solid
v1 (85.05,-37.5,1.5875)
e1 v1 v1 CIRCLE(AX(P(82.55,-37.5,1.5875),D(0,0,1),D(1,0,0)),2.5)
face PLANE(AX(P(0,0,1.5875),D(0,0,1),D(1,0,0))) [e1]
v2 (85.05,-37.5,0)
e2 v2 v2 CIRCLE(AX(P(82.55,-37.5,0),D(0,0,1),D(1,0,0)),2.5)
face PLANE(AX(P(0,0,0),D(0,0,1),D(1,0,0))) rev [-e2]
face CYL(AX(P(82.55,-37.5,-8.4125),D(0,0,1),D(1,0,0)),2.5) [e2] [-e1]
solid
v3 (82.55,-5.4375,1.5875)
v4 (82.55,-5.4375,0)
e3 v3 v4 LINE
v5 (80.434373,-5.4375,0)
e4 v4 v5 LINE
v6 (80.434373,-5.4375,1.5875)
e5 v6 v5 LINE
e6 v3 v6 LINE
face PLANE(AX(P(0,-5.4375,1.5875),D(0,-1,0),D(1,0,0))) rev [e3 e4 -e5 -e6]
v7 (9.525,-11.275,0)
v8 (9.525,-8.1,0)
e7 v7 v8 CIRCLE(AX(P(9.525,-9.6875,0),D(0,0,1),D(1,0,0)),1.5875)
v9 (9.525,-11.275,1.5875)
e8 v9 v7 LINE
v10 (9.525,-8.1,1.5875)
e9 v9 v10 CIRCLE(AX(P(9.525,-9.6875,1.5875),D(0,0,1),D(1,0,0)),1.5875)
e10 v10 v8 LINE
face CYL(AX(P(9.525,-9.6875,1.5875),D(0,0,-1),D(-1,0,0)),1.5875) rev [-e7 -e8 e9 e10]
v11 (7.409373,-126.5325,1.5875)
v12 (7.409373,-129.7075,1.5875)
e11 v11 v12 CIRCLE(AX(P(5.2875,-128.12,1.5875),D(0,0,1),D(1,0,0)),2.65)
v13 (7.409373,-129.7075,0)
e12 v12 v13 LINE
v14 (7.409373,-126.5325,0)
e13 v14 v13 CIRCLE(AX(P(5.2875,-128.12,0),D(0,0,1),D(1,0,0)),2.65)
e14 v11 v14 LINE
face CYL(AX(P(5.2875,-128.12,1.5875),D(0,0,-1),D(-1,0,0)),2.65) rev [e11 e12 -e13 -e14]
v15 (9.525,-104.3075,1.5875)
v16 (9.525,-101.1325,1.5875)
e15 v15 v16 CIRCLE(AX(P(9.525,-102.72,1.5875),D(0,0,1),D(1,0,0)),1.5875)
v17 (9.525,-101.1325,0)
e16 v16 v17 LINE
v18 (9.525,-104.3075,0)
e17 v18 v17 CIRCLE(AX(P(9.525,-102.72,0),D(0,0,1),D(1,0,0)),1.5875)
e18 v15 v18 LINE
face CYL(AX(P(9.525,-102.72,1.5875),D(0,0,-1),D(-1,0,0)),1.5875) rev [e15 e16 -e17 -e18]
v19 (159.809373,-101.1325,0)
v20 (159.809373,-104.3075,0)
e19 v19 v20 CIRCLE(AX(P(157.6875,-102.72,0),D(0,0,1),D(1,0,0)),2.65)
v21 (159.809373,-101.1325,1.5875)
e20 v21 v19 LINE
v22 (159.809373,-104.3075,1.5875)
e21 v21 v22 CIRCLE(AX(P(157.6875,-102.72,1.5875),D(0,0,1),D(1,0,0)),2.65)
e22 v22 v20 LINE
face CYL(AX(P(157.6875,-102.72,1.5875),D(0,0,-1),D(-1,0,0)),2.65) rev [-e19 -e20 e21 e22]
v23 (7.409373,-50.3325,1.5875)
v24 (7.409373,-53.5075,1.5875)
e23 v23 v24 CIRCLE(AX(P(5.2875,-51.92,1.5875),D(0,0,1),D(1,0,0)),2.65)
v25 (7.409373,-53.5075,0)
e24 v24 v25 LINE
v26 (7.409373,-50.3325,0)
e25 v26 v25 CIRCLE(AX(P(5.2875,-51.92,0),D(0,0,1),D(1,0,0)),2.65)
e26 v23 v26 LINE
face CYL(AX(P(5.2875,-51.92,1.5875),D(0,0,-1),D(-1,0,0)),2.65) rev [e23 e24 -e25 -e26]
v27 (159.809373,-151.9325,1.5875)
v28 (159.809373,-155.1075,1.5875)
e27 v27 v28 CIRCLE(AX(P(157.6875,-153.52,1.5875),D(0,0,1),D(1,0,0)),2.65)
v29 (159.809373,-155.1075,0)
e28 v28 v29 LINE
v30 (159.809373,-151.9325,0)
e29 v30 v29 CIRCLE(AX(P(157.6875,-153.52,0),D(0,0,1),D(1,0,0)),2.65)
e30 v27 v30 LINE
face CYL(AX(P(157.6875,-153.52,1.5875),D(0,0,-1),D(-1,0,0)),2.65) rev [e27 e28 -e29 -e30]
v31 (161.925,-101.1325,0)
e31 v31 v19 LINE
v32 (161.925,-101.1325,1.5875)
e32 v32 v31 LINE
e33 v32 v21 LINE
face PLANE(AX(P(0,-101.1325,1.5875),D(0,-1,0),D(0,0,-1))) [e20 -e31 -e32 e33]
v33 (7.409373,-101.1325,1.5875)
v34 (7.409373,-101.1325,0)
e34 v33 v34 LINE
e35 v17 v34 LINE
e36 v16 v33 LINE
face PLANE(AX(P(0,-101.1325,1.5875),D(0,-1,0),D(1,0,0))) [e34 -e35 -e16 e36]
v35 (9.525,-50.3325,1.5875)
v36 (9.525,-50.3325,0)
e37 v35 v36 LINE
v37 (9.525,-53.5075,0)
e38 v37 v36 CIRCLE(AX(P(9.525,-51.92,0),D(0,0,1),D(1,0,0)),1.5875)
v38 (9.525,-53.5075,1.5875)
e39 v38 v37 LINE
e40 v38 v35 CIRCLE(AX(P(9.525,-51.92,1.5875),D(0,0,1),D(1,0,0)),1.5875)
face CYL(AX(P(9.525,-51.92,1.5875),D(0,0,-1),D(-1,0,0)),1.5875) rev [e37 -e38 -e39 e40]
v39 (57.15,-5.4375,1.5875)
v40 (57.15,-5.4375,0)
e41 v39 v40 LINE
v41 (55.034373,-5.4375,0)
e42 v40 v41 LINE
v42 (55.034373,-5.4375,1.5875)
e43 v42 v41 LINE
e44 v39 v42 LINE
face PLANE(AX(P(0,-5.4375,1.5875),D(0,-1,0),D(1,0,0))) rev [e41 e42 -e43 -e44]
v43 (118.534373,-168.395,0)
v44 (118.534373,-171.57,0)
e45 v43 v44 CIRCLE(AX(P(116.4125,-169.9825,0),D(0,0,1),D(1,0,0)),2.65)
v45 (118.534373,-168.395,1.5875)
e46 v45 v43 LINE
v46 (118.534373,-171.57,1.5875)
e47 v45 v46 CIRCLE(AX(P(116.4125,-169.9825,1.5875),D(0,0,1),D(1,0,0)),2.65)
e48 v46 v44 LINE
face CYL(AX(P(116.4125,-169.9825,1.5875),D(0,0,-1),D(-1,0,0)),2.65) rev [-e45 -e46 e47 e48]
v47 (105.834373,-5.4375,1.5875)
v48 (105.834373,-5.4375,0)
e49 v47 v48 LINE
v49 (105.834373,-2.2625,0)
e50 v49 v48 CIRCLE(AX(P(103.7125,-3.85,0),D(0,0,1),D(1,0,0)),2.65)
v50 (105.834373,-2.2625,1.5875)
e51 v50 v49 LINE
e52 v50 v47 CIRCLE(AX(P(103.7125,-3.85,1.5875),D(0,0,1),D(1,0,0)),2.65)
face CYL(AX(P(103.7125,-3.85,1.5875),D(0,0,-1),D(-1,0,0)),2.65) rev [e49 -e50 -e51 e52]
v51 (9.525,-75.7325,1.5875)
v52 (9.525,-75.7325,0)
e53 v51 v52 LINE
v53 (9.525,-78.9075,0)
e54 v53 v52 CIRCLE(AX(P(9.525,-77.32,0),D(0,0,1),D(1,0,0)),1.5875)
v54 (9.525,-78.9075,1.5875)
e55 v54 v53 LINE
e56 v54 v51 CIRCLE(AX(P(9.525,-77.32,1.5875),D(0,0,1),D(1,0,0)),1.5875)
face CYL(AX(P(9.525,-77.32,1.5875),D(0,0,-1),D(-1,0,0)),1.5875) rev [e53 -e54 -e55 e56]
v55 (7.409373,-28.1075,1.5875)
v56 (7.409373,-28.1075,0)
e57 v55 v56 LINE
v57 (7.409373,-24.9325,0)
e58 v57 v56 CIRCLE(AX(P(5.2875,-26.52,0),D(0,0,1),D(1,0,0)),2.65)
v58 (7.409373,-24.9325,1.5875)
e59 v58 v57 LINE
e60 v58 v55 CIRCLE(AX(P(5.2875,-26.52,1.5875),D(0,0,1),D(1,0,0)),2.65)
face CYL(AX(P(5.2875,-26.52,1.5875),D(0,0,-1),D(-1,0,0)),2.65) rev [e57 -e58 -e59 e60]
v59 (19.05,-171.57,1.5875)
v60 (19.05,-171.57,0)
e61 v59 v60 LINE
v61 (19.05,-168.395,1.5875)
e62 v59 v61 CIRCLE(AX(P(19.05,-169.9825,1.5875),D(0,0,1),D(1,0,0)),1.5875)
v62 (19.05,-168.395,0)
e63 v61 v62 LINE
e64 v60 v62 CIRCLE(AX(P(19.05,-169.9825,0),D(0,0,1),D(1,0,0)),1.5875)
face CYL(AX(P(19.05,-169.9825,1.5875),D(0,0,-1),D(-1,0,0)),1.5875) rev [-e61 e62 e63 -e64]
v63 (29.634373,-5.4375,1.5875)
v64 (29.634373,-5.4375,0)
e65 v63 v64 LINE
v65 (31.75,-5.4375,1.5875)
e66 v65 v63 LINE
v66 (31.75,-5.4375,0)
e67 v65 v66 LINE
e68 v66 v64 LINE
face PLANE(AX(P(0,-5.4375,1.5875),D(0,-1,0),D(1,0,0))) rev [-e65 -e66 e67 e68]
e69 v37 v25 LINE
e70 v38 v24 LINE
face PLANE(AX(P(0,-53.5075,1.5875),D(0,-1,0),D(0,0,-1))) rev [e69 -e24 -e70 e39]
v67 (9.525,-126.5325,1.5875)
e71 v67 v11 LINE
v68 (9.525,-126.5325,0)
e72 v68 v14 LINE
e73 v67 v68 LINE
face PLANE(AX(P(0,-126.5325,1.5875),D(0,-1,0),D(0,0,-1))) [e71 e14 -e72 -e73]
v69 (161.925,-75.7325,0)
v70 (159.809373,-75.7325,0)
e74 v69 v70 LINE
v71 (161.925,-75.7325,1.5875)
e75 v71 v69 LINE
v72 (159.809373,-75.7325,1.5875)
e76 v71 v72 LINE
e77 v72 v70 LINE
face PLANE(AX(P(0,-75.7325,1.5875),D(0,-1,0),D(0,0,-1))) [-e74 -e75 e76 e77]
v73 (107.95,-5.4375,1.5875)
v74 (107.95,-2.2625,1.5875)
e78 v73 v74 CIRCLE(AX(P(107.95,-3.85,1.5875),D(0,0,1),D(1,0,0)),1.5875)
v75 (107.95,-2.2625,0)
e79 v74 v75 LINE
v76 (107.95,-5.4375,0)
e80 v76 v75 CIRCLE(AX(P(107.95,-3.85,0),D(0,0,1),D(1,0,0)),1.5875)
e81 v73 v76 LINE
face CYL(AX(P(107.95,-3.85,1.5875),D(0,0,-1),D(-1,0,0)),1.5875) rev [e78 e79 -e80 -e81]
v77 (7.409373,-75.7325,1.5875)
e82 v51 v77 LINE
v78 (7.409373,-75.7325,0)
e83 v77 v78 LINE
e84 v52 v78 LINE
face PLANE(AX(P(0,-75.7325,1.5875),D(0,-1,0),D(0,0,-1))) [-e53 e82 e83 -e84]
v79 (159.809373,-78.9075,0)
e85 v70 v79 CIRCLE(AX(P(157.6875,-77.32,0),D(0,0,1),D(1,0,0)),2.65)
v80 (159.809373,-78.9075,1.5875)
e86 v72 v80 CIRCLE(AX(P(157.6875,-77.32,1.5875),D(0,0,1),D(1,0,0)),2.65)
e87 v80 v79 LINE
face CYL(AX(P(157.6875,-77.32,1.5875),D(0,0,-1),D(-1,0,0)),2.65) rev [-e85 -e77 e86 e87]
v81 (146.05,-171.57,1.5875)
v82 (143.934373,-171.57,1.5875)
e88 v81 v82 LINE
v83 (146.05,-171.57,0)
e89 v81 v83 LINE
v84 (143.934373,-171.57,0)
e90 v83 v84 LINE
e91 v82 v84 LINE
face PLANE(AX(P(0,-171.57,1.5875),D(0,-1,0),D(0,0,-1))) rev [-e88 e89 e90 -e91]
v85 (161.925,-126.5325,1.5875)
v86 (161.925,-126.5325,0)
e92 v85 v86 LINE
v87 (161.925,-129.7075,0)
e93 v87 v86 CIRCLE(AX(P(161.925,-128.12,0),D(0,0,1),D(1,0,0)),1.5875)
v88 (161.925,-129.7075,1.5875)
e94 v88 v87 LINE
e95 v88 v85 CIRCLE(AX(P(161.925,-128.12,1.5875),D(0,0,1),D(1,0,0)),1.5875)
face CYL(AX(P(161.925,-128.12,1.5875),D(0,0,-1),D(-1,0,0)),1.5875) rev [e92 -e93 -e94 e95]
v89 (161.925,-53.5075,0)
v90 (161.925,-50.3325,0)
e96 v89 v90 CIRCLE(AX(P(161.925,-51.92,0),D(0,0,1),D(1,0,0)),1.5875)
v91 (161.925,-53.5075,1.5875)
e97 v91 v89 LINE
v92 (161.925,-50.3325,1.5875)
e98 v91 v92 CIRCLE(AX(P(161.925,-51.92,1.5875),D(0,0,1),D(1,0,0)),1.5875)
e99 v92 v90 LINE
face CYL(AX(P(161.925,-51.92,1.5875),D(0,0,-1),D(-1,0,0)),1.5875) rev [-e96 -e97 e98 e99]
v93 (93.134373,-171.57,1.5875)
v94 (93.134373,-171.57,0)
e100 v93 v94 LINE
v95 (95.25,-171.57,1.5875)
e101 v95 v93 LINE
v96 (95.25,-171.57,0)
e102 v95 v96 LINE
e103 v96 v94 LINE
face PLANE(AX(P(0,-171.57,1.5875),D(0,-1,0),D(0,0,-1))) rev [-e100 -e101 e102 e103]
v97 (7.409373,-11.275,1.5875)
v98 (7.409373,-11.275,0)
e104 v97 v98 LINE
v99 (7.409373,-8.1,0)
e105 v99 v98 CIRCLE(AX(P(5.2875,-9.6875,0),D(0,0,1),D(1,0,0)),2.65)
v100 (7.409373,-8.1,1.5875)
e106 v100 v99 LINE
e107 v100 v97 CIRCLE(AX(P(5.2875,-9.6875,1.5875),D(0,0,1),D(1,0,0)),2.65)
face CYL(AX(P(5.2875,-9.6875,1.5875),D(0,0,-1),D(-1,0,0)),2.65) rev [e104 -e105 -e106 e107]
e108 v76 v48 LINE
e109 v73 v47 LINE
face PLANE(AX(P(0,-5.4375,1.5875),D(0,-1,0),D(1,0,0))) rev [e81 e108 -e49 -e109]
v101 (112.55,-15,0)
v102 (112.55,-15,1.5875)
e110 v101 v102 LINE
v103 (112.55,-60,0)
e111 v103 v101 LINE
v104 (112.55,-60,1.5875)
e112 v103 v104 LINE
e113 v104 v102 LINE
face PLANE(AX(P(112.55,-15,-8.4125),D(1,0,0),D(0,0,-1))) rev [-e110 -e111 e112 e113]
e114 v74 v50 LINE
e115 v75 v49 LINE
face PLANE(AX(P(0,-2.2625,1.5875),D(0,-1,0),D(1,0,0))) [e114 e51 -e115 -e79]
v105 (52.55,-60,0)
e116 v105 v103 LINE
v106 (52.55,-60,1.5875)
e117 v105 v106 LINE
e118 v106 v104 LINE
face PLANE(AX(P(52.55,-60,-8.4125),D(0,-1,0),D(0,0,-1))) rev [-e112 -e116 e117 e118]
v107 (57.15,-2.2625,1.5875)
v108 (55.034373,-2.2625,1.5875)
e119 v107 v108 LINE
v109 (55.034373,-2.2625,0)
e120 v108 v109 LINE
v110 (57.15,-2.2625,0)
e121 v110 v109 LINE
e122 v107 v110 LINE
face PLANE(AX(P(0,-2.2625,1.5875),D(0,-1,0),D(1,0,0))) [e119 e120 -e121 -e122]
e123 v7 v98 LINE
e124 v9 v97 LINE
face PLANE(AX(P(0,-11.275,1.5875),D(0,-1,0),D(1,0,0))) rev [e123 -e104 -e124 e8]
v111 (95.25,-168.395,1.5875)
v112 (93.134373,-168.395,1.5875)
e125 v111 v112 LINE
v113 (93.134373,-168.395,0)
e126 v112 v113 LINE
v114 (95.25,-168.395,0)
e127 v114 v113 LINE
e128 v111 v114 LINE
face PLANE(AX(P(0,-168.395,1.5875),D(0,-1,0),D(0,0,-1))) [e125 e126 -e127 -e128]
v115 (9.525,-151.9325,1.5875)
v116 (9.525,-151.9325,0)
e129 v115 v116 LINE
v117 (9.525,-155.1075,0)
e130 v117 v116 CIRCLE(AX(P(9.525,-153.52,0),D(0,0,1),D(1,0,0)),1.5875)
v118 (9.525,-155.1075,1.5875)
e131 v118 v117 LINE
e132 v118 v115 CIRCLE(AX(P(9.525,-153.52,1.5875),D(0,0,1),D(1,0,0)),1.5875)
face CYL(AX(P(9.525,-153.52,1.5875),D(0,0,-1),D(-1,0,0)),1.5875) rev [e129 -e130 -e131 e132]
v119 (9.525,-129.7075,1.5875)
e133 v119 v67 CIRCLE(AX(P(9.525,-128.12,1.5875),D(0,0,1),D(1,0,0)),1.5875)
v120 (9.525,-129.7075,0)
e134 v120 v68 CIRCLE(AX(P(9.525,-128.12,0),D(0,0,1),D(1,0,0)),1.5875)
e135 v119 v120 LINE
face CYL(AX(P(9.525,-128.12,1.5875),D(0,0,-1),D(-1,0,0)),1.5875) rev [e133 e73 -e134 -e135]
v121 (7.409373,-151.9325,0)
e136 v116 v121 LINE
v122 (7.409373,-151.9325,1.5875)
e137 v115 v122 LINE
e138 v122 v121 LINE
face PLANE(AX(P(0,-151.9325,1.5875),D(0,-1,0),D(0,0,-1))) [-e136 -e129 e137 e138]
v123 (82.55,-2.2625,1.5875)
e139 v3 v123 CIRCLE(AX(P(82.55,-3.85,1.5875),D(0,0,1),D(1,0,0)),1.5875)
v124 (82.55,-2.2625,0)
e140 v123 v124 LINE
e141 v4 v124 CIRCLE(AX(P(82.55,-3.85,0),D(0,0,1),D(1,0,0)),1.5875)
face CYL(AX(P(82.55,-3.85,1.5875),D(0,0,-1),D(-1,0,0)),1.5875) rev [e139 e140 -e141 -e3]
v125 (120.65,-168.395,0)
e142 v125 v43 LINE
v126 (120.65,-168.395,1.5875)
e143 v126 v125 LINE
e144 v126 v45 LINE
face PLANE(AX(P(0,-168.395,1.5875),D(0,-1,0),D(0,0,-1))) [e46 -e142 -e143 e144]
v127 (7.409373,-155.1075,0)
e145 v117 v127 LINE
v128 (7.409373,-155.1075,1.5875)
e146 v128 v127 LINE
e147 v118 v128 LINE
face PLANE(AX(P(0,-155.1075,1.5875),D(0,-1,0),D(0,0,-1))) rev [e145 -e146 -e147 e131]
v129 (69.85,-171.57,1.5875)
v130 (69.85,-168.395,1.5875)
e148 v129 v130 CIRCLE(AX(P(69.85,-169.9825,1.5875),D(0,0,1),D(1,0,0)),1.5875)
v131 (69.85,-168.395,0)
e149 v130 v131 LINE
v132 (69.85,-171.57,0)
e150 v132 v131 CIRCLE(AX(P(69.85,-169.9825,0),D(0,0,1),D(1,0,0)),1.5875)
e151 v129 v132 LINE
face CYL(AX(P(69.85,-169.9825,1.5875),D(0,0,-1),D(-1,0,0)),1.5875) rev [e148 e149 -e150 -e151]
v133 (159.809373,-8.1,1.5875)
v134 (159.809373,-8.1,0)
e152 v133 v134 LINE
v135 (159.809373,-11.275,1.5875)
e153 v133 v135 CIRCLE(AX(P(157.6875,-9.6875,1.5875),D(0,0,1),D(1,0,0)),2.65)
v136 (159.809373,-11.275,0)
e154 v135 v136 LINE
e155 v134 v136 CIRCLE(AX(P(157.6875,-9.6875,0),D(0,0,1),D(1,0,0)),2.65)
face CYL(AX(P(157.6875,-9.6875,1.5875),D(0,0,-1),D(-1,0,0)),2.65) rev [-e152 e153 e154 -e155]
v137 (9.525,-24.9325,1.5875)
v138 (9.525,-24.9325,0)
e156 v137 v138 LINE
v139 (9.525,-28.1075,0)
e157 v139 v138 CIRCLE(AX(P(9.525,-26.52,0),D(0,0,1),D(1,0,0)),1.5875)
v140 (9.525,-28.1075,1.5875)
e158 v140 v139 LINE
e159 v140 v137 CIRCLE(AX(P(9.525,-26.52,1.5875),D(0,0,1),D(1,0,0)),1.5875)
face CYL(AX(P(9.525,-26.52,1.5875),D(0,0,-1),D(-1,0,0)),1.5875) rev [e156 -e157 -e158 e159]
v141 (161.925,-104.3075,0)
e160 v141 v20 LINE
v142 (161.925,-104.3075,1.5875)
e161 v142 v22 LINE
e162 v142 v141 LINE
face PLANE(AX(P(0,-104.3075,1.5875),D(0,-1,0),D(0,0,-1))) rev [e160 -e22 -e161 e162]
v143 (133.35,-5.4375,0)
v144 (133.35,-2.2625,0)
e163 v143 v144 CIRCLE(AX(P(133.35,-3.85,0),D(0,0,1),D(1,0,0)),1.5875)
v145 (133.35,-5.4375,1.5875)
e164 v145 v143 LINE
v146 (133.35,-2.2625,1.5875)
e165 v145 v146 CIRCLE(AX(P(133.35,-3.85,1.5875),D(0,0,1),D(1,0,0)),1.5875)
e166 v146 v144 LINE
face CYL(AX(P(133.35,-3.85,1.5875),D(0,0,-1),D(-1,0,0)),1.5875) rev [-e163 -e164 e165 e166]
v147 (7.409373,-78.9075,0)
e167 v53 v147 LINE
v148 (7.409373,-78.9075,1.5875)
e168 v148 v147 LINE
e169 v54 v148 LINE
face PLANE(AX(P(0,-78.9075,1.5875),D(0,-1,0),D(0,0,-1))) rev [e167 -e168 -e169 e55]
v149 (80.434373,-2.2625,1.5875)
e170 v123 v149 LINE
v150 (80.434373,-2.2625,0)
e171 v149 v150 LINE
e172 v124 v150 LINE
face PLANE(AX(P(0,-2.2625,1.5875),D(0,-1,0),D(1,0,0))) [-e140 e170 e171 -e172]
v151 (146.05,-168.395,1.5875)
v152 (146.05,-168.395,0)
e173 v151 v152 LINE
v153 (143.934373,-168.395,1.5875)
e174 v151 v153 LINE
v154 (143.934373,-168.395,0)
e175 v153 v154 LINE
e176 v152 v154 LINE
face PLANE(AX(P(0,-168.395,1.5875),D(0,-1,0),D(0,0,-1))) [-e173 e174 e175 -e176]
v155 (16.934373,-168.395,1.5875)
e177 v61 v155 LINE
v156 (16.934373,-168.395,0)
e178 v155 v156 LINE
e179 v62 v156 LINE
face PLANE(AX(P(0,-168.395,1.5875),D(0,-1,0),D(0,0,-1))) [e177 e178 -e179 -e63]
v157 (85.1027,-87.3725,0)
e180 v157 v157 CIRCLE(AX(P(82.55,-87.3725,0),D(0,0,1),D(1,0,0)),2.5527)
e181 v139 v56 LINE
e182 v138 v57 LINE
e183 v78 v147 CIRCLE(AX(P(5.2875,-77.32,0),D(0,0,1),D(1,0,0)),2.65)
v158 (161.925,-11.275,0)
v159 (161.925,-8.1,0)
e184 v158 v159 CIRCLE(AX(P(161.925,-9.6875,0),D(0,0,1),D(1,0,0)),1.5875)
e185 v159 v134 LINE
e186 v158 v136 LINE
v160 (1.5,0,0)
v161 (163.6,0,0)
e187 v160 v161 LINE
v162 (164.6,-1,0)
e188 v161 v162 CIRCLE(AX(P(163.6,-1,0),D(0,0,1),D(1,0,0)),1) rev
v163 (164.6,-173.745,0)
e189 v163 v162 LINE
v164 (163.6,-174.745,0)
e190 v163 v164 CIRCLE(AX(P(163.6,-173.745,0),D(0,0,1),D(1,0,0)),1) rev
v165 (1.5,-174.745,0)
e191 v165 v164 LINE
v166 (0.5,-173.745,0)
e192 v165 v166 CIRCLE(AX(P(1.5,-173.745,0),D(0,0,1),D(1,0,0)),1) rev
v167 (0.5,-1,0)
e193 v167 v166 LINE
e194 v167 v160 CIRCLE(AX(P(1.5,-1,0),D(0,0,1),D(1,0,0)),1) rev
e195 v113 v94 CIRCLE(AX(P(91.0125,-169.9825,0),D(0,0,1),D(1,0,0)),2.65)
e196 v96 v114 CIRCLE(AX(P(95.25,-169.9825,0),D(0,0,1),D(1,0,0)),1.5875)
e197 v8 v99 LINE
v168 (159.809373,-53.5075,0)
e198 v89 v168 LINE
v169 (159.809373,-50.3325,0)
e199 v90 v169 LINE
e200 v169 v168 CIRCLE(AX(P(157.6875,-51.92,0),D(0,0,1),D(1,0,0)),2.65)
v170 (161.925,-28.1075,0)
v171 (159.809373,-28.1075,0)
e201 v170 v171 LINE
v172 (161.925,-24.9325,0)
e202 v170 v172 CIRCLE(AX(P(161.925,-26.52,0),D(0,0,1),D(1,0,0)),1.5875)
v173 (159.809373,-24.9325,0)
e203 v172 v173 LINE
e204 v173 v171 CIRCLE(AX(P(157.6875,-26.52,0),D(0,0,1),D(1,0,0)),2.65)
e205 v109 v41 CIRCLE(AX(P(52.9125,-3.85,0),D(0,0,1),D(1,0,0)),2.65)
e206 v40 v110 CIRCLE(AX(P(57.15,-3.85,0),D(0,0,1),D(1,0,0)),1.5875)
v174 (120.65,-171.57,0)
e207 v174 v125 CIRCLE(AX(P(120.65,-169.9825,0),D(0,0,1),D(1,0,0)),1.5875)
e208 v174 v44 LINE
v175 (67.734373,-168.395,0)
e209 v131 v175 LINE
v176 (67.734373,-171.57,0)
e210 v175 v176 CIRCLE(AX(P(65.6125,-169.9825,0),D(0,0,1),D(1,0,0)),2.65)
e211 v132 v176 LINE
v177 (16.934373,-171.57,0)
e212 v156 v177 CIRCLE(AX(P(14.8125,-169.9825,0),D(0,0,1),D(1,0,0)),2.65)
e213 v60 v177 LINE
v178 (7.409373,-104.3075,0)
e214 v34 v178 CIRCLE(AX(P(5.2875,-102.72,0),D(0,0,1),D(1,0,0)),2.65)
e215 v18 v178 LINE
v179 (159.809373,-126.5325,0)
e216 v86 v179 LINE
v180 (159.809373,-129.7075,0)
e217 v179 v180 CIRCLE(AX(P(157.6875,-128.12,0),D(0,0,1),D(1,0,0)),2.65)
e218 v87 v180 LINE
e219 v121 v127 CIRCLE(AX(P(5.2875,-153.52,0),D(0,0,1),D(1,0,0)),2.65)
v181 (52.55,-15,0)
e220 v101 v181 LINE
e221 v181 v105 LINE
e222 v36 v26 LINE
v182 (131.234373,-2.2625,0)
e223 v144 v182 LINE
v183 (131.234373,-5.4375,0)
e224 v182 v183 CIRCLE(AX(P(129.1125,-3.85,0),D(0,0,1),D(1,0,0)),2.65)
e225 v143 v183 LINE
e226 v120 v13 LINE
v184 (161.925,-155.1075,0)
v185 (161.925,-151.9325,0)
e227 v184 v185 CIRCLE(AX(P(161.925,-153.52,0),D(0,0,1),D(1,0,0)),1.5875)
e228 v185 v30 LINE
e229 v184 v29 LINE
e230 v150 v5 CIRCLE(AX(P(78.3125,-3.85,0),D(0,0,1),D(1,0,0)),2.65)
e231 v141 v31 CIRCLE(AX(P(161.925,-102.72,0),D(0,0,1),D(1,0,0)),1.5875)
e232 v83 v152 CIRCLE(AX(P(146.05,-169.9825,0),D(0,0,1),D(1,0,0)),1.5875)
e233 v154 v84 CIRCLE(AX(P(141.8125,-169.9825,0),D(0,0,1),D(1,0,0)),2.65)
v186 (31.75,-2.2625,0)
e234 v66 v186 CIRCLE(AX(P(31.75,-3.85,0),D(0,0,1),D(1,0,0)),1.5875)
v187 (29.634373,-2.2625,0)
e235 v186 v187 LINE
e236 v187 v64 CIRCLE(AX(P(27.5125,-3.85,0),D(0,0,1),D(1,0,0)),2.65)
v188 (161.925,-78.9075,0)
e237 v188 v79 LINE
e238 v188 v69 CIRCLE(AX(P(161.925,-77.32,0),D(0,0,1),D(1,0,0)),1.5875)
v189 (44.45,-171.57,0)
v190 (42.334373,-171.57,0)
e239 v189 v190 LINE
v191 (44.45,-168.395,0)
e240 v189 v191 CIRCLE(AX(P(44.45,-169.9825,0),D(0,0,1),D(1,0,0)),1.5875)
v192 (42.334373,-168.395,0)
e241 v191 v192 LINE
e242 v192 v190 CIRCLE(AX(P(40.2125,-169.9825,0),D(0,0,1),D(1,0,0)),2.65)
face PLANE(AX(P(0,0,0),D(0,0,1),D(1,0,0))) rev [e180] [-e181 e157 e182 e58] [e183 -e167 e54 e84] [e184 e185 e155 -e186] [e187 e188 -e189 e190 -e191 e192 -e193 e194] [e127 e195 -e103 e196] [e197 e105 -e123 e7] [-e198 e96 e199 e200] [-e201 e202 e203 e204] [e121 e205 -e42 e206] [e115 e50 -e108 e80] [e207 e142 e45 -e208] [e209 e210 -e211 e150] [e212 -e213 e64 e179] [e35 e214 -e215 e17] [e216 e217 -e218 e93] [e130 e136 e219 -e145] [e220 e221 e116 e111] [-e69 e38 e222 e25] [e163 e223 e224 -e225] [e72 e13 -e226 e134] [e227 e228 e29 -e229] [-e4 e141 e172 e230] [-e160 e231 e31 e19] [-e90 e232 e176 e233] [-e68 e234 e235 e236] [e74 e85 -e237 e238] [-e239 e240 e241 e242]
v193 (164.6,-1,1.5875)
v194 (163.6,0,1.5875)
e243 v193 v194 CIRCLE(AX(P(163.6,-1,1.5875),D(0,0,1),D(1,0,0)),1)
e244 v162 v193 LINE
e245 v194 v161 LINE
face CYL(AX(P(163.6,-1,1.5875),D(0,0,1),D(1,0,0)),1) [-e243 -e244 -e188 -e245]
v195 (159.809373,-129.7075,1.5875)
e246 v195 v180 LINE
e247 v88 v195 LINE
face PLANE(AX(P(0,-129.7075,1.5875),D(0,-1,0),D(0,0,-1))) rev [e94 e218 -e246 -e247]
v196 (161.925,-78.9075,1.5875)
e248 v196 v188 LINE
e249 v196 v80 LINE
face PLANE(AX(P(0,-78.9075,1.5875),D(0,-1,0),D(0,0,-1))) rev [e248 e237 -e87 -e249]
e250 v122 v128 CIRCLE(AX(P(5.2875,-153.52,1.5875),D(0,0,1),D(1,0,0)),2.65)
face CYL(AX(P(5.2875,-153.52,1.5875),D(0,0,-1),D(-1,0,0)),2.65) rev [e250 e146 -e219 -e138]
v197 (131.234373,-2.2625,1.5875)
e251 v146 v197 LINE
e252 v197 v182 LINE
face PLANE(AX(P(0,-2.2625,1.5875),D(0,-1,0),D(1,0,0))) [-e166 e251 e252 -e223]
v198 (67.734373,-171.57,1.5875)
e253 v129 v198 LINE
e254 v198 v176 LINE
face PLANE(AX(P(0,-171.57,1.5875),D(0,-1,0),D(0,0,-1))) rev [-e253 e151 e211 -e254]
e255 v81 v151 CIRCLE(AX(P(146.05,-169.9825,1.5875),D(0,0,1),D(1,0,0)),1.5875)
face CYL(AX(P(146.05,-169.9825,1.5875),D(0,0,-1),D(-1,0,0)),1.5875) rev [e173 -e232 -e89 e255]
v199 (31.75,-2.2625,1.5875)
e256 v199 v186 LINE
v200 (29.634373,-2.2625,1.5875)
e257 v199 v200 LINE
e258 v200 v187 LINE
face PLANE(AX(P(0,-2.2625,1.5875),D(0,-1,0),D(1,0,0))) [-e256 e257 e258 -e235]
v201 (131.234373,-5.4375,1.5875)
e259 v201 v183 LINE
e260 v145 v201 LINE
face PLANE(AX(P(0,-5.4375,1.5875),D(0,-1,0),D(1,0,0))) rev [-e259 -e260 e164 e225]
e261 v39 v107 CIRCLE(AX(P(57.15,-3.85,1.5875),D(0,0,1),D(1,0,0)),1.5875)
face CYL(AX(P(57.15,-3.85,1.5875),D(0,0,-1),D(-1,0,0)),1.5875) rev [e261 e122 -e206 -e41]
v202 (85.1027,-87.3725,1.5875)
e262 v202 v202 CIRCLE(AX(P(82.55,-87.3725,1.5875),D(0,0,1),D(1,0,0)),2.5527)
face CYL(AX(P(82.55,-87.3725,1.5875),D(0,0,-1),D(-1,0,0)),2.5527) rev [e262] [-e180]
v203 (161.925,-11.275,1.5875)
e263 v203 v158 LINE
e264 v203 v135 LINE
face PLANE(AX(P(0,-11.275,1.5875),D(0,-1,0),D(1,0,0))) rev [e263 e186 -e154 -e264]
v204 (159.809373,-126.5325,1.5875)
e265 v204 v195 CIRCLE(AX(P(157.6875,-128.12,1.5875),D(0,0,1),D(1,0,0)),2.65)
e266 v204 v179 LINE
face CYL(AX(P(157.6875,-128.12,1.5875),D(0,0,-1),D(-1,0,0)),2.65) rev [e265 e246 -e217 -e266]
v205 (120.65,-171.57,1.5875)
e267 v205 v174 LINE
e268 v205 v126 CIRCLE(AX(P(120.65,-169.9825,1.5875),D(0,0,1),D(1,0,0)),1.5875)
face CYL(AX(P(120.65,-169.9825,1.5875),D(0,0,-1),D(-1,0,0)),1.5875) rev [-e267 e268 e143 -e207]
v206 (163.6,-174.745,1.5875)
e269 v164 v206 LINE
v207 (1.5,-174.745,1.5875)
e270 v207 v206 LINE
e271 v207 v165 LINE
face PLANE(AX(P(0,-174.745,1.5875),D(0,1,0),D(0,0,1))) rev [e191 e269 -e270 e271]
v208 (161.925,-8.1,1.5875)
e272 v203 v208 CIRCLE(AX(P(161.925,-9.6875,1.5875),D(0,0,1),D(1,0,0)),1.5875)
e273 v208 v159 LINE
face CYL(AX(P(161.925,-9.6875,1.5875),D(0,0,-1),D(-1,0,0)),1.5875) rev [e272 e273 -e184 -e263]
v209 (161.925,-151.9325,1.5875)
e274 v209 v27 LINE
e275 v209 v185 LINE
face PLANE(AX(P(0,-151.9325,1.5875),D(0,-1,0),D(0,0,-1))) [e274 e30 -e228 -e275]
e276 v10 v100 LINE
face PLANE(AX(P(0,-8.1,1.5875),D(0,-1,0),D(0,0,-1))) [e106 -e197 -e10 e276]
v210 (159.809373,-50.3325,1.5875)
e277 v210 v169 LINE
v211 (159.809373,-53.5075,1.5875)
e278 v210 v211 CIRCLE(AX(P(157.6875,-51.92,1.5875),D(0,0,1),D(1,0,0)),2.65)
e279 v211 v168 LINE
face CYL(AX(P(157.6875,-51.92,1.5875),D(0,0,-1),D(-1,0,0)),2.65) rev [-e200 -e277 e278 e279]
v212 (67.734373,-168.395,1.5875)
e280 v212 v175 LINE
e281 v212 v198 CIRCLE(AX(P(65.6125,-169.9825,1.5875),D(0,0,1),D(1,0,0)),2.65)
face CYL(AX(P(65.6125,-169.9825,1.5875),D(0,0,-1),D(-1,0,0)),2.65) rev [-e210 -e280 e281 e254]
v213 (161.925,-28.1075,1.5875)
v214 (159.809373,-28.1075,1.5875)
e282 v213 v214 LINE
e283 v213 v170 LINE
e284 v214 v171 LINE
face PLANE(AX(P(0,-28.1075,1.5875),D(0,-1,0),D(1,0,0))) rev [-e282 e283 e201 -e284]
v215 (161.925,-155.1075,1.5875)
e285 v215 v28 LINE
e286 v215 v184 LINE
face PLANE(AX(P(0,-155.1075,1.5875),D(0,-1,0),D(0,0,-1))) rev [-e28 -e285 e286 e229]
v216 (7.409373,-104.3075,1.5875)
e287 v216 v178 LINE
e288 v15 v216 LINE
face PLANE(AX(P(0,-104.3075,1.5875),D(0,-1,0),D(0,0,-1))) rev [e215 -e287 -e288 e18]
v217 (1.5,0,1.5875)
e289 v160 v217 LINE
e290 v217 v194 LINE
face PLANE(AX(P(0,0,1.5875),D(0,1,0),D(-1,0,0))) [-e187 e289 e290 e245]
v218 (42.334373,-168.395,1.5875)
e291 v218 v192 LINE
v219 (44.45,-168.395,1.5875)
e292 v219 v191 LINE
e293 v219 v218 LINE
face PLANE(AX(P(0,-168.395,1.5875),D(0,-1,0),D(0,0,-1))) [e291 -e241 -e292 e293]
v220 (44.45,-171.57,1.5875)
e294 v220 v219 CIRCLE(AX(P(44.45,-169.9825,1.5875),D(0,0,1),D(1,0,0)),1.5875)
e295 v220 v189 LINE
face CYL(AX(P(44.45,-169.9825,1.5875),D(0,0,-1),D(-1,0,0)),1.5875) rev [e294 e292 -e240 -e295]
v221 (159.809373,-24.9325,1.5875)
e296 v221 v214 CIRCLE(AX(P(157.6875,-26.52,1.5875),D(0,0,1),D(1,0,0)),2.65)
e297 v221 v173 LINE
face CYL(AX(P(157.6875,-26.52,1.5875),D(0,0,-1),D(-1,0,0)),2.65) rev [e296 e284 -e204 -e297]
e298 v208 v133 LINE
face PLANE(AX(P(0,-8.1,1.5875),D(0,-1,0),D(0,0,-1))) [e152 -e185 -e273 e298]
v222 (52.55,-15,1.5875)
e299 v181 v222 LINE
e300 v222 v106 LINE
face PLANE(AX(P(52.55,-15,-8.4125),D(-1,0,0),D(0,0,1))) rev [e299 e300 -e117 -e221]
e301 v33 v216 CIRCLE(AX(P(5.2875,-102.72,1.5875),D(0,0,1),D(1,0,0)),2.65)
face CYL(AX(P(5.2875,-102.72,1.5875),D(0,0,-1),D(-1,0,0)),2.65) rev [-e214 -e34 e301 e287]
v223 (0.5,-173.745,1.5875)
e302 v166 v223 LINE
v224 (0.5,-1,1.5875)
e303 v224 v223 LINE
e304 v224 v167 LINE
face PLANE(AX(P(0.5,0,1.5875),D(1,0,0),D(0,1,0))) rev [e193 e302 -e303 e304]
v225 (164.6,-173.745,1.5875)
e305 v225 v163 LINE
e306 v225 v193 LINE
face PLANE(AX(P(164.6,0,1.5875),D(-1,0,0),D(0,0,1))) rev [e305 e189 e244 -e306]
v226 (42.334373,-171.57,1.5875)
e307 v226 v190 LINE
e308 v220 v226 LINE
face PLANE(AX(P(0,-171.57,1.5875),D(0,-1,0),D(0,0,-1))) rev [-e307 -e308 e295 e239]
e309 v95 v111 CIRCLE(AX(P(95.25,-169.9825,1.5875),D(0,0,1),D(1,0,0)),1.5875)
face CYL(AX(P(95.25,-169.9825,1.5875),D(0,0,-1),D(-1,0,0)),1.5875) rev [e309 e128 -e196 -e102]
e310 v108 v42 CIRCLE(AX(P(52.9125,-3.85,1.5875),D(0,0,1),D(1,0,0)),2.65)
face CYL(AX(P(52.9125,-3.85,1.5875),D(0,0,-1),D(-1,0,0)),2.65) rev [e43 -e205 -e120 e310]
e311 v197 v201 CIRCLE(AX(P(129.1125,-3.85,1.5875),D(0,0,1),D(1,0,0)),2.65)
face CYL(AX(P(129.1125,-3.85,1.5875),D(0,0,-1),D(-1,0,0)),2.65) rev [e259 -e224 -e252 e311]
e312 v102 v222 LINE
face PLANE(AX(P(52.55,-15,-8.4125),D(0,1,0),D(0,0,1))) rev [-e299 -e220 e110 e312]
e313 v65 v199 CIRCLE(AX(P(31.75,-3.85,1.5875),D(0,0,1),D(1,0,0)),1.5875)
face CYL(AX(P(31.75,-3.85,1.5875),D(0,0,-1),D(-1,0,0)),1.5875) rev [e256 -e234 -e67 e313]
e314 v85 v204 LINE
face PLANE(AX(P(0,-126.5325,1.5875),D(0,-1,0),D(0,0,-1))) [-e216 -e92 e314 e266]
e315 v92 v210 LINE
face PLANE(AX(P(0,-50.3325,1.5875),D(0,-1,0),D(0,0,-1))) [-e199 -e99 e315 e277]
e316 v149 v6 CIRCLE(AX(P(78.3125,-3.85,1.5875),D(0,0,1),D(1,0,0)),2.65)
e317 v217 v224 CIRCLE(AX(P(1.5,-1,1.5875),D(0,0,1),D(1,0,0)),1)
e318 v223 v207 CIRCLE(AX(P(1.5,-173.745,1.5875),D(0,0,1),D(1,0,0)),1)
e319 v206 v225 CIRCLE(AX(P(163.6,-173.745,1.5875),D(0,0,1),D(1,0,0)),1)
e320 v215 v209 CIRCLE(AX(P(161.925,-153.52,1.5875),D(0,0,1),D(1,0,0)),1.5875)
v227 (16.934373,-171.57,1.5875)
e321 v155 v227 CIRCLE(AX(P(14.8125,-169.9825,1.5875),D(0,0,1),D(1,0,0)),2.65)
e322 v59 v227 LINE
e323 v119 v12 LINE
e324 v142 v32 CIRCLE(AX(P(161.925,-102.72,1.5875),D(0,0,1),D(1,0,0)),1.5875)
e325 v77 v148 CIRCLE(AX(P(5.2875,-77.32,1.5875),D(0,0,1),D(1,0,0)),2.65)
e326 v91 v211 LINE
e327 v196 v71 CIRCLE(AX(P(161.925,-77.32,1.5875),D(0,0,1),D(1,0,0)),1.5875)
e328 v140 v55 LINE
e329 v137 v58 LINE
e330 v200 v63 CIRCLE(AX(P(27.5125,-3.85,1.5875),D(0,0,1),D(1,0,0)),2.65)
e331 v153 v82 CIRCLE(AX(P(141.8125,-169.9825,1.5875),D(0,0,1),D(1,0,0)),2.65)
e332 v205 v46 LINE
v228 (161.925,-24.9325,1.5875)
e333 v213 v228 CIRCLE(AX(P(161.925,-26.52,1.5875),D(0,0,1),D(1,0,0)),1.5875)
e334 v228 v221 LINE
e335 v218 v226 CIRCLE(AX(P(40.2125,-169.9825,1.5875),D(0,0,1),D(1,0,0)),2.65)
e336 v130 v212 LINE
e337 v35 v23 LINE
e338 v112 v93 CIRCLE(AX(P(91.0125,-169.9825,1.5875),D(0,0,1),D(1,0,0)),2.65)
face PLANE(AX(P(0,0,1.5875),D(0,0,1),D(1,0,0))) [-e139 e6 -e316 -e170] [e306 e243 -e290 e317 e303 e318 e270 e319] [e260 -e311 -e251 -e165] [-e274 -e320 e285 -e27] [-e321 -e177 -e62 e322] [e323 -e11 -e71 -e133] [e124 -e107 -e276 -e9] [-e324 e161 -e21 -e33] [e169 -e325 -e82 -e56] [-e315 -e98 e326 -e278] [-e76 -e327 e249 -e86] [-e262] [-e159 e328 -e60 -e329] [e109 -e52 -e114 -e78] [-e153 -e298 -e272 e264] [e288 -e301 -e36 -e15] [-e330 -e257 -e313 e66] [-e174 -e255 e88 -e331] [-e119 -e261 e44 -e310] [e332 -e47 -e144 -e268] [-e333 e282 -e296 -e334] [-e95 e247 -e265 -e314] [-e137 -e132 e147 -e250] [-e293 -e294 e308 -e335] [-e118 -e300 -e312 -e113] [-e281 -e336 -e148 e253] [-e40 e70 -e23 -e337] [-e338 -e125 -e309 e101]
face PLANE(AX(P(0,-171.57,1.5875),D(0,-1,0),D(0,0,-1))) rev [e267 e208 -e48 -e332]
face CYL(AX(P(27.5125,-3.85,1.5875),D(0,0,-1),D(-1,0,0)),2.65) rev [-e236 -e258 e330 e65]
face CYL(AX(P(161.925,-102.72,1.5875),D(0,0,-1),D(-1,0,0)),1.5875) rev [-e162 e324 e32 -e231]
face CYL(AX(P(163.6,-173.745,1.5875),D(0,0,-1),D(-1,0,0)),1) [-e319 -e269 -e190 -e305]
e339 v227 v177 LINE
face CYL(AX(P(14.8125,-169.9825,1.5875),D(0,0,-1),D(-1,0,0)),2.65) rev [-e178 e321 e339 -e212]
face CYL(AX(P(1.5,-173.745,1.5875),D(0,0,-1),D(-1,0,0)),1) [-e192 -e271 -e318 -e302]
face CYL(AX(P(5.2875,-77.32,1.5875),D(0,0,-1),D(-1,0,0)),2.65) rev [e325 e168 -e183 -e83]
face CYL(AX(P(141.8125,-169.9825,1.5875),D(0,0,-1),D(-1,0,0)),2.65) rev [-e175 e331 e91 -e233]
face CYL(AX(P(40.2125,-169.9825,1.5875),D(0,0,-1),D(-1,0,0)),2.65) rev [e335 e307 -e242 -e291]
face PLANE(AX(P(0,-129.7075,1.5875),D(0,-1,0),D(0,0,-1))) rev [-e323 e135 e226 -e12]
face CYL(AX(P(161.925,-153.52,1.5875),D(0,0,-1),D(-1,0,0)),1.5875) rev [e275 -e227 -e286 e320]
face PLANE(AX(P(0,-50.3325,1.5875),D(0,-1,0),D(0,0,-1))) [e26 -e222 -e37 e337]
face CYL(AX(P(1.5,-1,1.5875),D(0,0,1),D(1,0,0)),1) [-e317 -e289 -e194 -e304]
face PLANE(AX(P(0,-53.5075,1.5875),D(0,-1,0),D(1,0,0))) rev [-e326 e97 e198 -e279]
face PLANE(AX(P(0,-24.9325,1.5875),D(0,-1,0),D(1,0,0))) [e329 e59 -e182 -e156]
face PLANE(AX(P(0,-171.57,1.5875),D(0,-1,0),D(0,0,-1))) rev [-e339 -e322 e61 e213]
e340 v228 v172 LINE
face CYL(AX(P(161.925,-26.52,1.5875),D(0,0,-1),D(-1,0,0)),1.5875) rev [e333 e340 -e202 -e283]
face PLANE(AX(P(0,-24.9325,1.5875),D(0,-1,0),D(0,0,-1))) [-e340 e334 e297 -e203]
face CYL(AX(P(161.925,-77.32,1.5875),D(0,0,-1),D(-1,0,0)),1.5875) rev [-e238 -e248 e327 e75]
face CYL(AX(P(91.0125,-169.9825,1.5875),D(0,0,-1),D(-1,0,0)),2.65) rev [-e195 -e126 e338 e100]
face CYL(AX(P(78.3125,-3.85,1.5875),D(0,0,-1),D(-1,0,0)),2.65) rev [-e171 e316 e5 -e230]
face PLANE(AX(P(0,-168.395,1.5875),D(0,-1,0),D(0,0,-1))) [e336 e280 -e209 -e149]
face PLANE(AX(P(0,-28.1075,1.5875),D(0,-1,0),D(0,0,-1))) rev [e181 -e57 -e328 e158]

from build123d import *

# Parameters (mm, degrees)
SKETCH1_W           = 164.1
SKETCH1_H           = 174.745
SKETCH1_R           = 2.5527
BOSS_EXTRUDE1_DEPTH = 1.5875
FILLET1_R           = 1
SKETCH2_W           = 60
SKETCH2_H           = 45
SKETCH2_R           = 2.5
CUT_EXTRUDE1_DEPTH  = 10


with BuildPart() as part:
    # Sketch1 → Boss-Extrude1 (new body)
    with BuildSketch(Plane.XY):
        with Locations((82.55, -87.3725)):
            Rectangle(SKETCH1_W, SKETCH1_H)
        with Locations((82.55, -87.3725)):
            Circle(SKETCH1_R, mode=Mode.SUBTRACT)
        with BuildLine():
            Line((82.55, -5.4375), (80.434372699, -5.4375))
            ThreePointArc((80.434372699, -5.4375), (75.6625, -3.85), (80.434372699, -2.2625))
            Line((80.434372699, -2.2625), (82.55, -2.2625))
            ThreePointArc((82.55, -2.2625), (84.1375, -3.85), (82.55, -5.4375))
        make_face(mode=Mode.SUBTRACT)
        with BuildLine():
            Line((16.934372699, -168.395), (19.05, -168.395))
            ThreePointArc((19.05, -168.395), (20.6375, -169.9825), (19.05, -171.57))
            Line((19.05, -171.57), (16.934372699, -171.57))
            ThreePointArc((16.934372699, -171.57), (12.1625, -169.9825), (16.934372699, -168.395))
        make_face(mode=Mode.SUBTRACT)
        with BuildLine():
            Line((7.409372699, -151.9325), (9.525, -151.9325))
            ThreePointArc((9.525, -151.9325), (11.1125, -153.52), (9.525, -155.1075))
            Line((9.525, -155.1075), (7.409372699, -155.1075))
            ThreePointArc((7.409372699, -155.1075), (2.6375, -153.52), (7.409372699, -151.9325))
        make_face(mode=Mode.SUBTRACT)
        with BuildLine():
            Line((42.334372699, -168.395), (44.45, -168.395))
            ThreePointArc((44.45, -168.395), (46.0375, -169.9825), (44.45, -171.57))
            Line((44.45, -171.57), (42.334372699, -171.57))
            ThreePointArc((42.334372699, -171.57), (37.5625, -169.9825), (42.334372699, -168.395))
        make_face(mode=Mode.SUBTRACT)
        with BuildLine():
            Line((67.734372699, -168.395), (69.85, -168.395))
            ThreePointArc((69.85, -168.395), (71.4375, -169.9825), (69.85, -171.57))
            Line((69.85, -171.57), (67.734372699, -171.57))
            ThreePointArc((67.734372699, -171.57), (62.9625, -169.9825), (67.734372699, -168.395))
        make_face(mode=Mode.SUBTRACT)
        with BuildLine():
            Line((7.409372699, -126.5325), (9.525, -126.5325))
            ThreePointArc((9.525, -126.5325), (11.1125, -128.12), (9.525, -129.7075))
            Line((9.525, -129.7075), (7.409372699, -129.7075))
            ThreePointArc((7.409372699, -129.7075), (2.6375, -128.12), (7.409372699, -126.5325))
        make_face(mode=Mode.SUBTRACT)
        with BuildLine():
            Line((7.409372699, -101.1325), (9.525, -101.1325))
            ThreePointArc((9.525, -101.1325), (11.1125, -102.72), (9.525, -104.3075))
            Line((9.525, -104.3075), (7.409372699, -104.3075))
            ThreePointArc((7.409372699, -104.3075), (2.6375, -102.72), (7.409372699, -101.1325))
        make_face(mode=Mode.SUBTRACT)
        with BuildLine():
            Line((7.409372699, -75.7325), (9.525, -75.7325))
            ThreePointArc((9.525, -75.7325), (11.1125, -77.32), (9.525, -78.9075))
            Line((9.525, -78.9075), (7.409372699, -78.9075))
            ThreePointArc((7.409372699, -78.9075), (2.6375, -77.32), (7.409372699, -75.7325))
        make_face(mode=Mode.SUBTRACT)
        with BuildLine():
            Line((7.409372699, -50.3325), (9.525, -50.3325))
            ThreePointArc((9.525, -50.3325), (11.1125, -51.92), (9.525, -53.5075))
            Line((9.525, -53.5075), (7.409372699, -53.5075))
            ThreePointArc((7.409372699, -53.5075), (2.6375, -51.92), (7.409372699, -50.3325))
        make_face(mode=Mode.SUBTRACT)
        with BuildLine():
            Line((7.409372699, -24.9325), (9.525, -24.9325))
            ThreePointArc((9.525, -24.9325), (11.1125, -26.52), (9.525, -28.1075))
            Line((9.525, -28.1075), (7.409372699, -28.1075))
            ThreePointArc((7.409372699, -28.1075), (2.6375, -26.52), (7.409372699, -24.9325))
        make_face(mode=Mode.SUBTRACT)
        with BuildLine():
            Line((7.409372699, -8.1), (9.525, -8.1))
            ThreePointArc((9.525, -8.1), (11.1125, -9.6875), (9.525, -11.275))
            Line((9.525, -11.275), (7.409372699, -11.275))
            ThreePointArc((7.409372699, -11.275), (2.6375, -9.6875), (7.409372699, -8.1))
        make_face(mode=Mode.SUBTRACT)
        with BuildLine():
            Line((29.634372699, -2.2625), (31.75, -2.2625))
            ThreePointArc((31.75, -2.2625), (33.3375, -3.85), (31.75, -5.4375))
            Line((31.75, -5.4375), (29.634372699, -5.4375))
            ThreePointArc((29.634372699, -5.4375), (24.8625, -3.85), (29.634372699, -2.2625))
        make_face(mode=Mode.SUBTRACT)
        with BuildLine():
            Line((55.034372699, -2.2625), (57.15, -2.2625))
            ThreePointArc((57.15, -2.2625), (58.7375, -3.85), (57.15, -5.4375))
            Line((57.15, -5.4375), (55.034372699, -5.4375))
            ThreePointArc((55.034372699, -5.4375), (50.2625, -3.85), (55.034372699, -2.2625))
        make_face(mode=Mode.SUBTRACT)
        with BuildLine():
            ThreePointArc((161.925, -8.1), (163.5125, -9.6875), (161.925, -11.275))
            Line((161.925, -11.275), (159.809372699, -11.275))
            ThreePointArc((159.809372699, -11.275), (155.0375, -9.6875), (159.809372699, -8.1))
            Line((159.809372699, -8.1), (161.925, -8.1))
        make_face(mode=Mode.SUBTRACT)
        with BuildLine():
            Line((93.134372699, -168.395), (95.25, -168.395))
            ThreePointArc((95.25, -168.395), (96.8375, -169.9825), (95.25, -171.57))
            Line((95.25, -171.57), (93.134372699, -171.57))
            ThreePointArc((93.134372699, -171.57), (88.3625, -169.9825), (93.134372699, -168.395))
        make_face(mode=Mode.SUBTRACT)
        with BuildLine():
            Line((118.534372699, -168.395), (120.65, -168.395))
            ThreePointArc((120.65, -168.395), (122.2375, -169.9825), (120.65, -171.57))
            Line((120.65, -171.57), (118.534372699, -171.57))
            ThreePointArc((118.534372699, -171.57), (113.7625, -169.9825), (118.534372699, -168.395))
        make_face(mode=Mode.SUBTRACT)
        with BuildLine():
            Line((143.934372699, -168.395), (146.05, -168.395))
            ThreePointArc((146.05, -168.395), (147.6375, -169.9825), (146.05, -171.57))
            Line((146.05, -171.57), (143.934372699, -171.57))
            ThreePointArc((143.934372699, -171.57), (139.1625, -169.9825), (143.934372699, -168.395))
        make_face(mode=Mode.SUBTRACT)
        with BuildLine():
            Line((159.809372699, -151.9325), (161.925, -151.9325))
            ThreePointArc((161.925, -151.9325), (163.5125, -153.52), (161.925, -155.1075))
            Line((161.925, -155.1075), (159.809372699, -155.1075))
            ThreePointArc((159.809372699, -155.1075), (155.0375, -153.52), (159.809372699, -151.9325))
        make_face(mode=Mode.SUBTRACT)
        with BuildLine():
            Line((159.809372699, -126.5325), (161.925, -126.5325))
            ThreePointArc((161.925, -126.5325), (163.5125, -128.12), (161.925, -129.7075))
            Line((161.925, -129.7075), (159.809372699, -129.7075))
            ThreePointArc((159.809372699, -129.7075), (155.0375, -128.12), (159.809372699, -126.5325))
        make_face(mode=Mode.SUBTRACT)
        with BuildLine():
            Line((159.809372699, -101.1325), (161.925, -101.1325))
            ThreePointArc((161.925, -101.1325), (163.5125, -102.72), (161.925, -104.3075))
            Line((161.925, -104.3075), (159.809372699, -104.3075))
            ThreePointArc((159.809372699, -104.3075), (155.0375, -102.72), (159.809372699, -101.1325))
        make_face(mode=Mode.SUBTRACT)
        with BuildLine():
            Line((159.809372699, -75.7325), (161.925, -75.7325))
            ThreePointArc((161.925, -75.7325), (163.5125, -77.32), (161.925, -78.9075))
            Line((161.925, -78.9075), (159.809372699, -78.9075))
            ThreePointArc((159.809372699, -78.9075), (155.0375, -77.32), (159.809372699, -75.7325))
        make_face(mode=Mode.SUBTRACT)
        with BuildLine():
            Line((159.809372699, -50.3325), (161.925, -50.3325))
            ThreePointArc((161.925, -50.3325), (163.5125, -51.92), (161.925, -53.5075))
            Line((161.925, -53.5075), (159.809372699, -53.5075))
            ThreePointArc((159.809372699, -53.5075), (155.0375, -51.92), (159.809372699, -50.3325))
        make_face(mode=Mode.SUBTRACT)
        with BuildLine():
            Line((105.834372699, -2.2625), (107.95, -2.2625))
            ThreePointArc((107.95, -2.2625), (109.5375, -3.85), (107.95, -5.4375))
            Line((107.95, -5.4375), (105.834372699, -5.4375))
            ThreePointArc((105.834372699, -5.4375), (101.0625, -3.85), (105.834372699, -2.2625))
        make_face(mode=Mode.SUBTRACT)
        with BuildLine():
            Line((159.809372699, -24.9325), (161.925, -24.9325))
            ThreePointArc((161.925, -24.9325), (163.5125, -26.52), (161.925, -28.1075))
            Line((161.925, -28.1075), (159.809372699, -28.1075))
            ThreePointArc((159.809372699, -28.1075), (155.0375, -26.52), (159.809372699, -24.9325))
        make_face(mode=Mode.SUBTRACT)
        with BuildLine():
            Line((131.234372699, -2.2625), (133.35, -2.2625))
            ThreePointArc((133.35, -2.2625), (134.9375, -3.85), (133.35, -5.4375))
            Line((133.35, -5.4375), (131.234372699, -5.4375))
            ThreePointArc((131.234372699, -5.4375), (126.4625, -3.85), (131.234372699, -2.2625))
        make_face(mode=Mode.SUBTRACT)
    extrude(amount=BOSS_EXTRUDE1_DEPTH)

    # Fillet1
    fillet1_edges = [part.edges().sort_by_distance(p)[0] for p in [
        (0.5, -174.745, 0.79375),
        (0.5, 0, 0.79375),
        (164.6, 0, 0.79375),
        (164.6, -174.745, 0.79375),
    ]]
    fillet(fillet1_edges, radius=FILLET1_R)

    # Sketch2 → Cut-Extrude1 (cut)
    with BuildSketch(Plane.XY.offset(1.5875)):
        with Locations((82.55, -37.5)):
            Rectangle(SKETCH2_W, SKETCH2_H)
        with Locations((82.55, -37.5)):
            Circle(SKETCH2_R, mode=Mode.SUBTRACT)
    extrude(amount=-CUT_EXTRUDE1_DEPTH, mode=Mode.SUBTRACT)


with BuildPart() as cut_extrude1_piece_1:
    # of the separate pieces the step leaves, piece 1, a body of its own (cut_extrude1_pieces)
    add(part.part.solids().sort_by_distance((0.5, -1, 0))[0])


with BuildPart() as cut_extrude1_piece_2:
    # of the separate pieces the step leaves, piece 2, a body of its own (cut_extrude1_pieces)
    add(part.part.solids().sort_by_distance((85.05, -37.5, 0))[0])


solid = Compound([cut_extrude1_piece_1.part, cut_extrude1_piece_2.part])
